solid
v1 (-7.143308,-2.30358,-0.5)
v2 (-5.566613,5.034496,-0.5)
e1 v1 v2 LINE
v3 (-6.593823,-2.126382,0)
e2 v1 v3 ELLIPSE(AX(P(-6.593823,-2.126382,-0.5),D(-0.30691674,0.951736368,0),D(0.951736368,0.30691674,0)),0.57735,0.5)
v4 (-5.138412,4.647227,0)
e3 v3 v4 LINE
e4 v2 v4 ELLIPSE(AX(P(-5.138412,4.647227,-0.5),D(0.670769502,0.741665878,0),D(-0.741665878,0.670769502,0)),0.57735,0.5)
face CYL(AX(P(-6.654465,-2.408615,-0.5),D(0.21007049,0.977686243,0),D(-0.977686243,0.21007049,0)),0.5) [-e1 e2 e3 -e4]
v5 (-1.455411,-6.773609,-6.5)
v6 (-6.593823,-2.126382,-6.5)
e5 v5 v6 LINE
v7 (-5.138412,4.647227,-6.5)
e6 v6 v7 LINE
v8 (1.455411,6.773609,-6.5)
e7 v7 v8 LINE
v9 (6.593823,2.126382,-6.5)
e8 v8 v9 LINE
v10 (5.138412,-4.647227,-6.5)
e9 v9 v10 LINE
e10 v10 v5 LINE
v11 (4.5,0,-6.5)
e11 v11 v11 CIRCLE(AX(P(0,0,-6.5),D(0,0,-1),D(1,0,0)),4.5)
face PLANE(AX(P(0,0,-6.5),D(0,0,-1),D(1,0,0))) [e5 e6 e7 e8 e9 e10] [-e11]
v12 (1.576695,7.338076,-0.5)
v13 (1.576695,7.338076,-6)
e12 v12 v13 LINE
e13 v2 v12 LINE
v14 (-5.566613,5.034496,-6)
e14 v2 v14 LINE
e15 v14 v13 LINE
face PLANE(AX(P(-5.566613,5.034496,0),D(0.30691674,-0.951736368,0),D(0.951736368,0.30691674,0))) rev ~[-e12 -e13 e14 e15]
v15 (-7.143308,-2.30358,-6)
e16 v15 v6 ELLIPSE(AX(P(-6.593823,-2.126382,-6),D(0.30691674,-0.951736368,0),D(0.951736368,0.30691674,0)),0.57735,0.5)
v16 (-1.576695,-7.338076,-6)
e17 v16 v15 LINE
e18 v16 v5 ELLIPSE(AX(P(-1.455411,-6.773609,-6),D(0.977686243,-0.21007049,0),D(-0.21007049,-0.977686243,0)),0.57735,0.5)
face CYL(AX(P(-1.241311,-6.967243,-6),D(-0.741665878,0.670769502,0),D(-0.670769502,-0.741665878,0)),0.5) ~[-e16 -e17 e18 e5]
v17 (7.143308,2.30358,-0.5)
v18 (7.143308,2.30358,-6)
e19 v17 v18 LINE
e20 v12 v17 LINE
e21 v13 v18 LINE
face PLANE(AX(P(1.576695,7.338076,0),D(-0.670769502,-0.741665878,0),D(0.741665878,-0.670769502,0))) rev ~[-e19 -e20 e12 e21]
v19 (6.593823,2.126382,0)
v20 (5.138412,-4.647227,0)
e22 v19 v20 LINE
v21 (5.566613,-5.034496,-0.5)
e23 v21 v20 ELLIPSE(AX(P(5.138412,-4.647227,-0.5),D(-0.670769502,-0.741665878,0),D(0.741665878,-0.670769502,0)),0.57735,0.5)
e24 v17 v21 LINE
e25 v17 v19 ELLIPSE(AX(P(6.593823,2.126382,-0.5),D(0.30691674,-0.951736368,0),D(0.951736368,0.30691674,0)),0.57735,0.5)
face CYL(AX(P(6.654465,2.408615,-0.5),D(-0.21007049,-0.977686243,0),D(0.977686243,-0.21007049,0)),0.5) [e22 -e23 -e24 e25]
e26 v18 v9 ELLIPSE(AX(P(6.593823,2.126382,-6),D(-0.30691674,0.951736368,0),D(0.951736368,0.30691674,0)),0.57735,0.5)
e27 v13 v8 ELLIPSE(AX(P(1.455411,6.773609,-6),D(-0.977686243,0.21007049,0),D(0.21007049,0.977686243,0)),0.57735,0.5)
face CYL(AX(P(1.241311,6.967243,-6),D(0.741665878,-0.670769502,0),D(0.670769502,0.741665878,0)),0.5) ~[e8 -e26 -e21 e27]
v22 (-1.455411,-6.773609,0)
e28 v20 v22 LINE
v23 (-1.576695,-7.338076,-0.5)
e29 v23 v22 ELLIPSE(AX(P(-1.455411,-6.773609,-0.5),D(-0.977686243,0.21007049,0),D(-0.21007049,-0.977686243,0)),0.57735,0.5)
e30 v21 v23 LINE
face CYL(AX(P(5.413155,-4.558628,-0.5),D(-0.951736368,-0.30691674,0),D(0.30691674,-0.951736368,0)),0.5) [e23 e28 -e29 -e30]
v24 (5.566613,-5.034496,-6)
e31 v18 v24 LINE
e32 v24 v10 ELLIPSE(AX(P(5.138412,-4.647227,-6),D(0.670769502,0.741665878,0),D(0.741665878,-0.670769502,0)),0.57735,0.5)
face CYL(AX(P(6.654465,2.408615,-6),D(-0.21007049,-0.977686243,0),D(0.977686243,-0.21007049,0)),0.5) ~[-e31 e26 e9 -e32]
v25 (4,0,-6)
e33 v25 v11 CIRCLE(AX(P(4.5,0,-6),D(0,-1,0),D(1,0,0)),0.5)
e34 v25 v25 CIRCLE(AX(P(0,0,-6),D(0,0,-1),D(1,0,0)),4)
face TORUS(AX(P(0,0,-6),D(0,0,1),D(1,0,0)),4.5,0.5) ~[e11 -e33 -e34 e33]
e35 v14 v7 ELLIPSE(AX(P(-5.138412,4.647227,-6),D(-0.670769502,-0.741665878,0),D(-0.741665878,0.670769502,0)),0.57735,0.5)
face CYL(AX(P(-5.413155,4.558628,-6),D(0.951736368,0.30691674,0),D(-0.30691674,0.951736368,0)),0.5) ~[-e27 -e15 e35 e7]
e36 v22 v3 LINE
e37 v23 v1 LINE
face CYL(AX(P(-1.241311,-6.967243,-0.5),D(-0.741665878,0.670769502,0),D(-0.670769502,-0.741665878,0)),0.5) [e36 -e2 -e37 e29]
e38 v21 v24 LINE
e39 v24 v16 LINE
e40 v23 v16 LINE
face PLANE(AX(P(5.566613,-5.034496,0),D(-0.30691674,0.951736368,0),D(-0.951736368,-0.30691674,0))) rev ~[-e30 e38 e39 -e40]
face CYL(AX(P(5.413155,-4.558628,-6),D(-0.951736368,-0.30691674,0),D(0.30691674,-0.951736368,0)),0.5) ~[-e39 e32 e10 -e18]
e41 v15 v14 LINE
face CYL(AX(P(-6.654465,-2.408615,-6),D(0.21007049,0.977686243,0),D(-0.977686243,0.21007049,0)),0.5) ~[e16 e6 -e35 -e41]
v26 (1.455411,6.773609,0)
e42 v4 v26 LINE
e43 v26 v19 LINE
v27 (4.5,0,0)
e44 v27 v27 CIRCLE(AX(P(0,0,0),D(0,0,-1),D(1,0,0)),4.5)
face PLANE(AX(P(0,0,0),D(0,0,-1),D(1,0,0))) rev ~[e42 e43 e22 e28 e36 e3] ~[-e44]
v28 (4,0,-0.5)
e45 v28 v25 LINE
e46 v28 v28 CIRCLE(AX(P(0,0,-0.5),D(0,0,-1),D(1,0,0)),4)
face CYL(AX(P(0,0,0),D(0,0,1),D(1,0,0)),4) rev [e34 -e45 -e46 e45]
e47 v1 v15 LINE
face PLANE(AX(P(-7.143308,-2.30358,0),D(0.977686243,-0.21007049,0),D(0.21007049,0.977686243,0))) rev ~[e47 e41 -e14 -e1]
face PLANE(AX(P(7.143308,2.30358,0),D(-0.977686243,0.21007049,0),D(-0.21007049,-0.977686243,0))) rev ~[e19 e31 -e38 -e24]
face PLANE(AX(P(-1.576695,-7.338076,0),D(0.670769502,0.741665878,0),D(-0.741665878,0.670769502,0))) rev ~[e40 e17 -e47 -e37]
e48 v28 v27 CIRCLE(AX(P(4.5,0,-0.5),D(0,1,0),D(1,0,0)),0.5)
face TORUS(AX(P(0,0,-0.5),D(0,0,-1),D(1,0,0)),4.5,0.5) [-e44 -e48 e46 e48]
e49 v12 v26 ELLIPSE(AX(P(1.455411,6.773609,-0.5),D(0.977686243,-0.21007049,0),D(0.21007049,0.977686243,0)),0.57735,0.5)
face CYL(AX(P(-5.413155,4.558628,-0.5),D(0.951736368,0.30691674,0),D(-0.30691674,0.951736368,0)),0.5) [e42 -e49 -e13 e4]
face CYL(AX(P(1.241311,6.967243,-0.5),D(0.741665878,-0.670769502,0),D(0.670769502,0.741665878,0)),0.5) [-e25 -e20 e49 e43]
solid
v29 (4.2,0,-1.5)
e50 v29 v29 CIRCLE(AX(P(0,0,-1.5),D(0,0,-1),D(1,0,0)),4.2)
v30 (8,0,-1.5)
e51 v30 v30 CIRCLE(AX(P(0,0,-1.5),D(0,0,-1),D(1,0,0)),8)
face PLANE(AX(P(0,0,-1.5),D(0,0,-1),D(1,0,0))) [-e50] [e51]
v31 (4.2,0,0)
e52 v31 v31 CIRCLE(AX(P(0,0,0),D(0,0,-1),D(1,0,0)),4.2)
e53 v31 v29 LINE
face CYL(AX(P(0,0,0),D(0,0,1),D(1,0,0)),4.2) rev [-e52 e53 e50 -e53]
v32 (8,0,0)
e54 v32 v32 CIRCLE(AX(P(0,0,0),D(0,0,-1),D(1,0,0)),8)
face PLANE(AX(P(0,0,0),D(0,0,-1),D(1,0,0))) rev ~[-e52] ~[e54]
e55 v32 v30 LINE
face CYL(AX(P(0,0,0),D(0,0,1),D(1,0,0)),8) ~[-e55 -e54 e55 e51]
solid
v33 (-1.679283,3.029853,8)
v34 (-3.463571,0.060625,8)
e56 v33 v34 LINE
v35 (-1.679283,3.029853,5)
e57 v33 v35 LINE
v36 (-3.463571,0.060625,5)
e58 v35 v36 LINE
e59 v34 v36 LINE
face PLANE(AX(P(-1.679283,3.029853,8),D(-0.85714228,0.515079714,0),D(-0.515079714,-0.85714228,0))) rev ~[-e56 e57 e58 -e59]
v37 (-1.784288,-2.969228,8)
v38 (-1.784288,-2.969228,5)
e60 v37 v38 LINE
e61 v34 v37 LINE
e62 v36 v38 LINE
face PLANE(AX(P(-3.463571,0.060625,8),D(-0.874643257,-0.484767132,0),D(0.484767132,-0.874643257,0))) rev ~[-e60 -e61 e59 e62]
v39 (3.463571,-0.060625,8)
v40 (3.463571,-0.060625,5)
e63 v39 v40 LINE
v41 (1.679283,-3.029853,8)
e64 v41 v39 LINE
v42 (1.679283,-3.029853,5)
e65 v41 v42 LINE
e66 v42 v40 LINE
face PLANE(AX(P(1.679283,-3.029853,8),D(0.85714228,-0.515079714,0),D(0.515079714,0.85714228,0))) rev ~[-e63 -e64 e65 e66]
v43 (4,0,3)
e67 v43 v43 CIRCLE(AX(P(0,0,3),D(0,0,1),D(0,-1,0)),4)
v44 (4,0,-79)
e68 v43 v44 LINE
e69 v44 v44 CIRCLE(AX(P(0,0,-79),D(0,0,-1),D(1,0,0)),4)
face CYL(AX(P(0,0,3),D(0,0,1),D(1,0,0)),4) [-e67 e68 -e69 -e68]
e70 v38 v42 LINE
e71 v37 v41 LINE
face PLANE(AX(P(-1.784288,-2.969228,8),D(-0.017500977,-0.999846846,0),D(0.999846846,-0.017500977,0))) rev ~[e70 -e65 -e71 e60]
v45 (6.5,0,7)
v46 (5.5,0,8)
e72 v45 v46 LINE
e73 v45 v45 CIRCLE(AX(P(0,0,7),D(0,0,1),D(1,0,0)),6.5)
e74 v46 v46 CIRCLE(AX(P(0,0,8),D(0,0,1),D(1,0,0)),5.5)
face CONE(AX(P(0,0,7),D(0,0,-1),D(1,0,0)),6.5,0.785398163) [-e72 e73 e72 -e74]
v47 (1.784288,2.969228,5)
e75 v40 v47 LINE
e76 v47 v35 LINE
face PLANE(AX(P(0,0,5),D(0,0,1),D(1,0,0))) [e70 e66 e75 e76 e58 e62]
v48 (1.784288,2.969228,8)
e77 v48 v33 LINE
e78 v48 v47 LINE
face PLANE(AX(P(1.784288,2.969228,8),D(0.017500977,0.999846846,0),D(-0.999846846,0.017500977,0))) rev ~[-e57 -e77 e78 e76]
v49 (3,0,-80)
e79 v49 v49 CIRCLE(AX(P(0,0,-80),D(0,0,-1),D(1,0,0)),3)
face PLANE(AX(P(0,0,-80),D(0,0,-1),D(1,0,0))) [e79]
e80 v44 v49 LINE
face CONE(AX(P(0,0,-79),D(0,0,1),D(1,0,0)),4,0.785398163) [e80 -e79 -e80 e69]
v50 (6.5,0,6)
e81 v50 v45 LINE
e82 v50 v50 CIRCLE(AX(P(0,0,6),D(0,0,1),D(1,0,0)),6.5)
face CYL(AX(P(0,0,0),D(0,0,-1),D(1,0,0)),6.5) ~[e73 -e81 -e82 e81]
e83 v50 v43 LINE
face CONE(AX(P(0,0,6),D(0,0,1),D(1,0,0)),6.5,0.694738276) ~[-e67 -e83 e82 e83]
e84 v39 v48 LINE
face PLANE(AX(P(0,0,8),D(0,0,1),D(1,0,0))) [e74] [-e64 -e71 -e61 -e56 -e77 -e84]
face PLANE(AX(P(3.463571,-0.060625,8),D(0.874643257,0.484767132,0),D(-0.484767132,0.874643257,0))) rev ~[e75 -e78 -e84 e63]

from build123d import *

# Parameters (mm, degrees)
F0_R         = 6.5
F1_DEPTH     = 8
F2_R         = 4
F3_DEPTH     = 80
F5_DEPTH     = 3
F6_SIZE      = 1
F7_R         = 4
F8_DEPTH     = 6.5
F9_R         = 0.5
F10_R        = 8
F10_R_2      = 4.2
F11_DEPTH    = 1.5
F12_S5_R     = 4
F12_T6_DEPTH = 11


# Not quite as in the source:
# - a fillet or chamfer that OpenCascade refuses, or shapes differently, is made with other operations: its cross-section is extruded or revolved along the edge and cut away or added


with BuildPart() as f1:
    # F0 (on Top) → F1 (new body)
    with BuildSketch(Plane.XY):
        Circle(F0_R)
    extrude(amount=F1_DEPTH)

    # F2 (on face) → F3 (join)
    with BuildSketch(Plane(origin=(0, 0, 0), x_dir=(1, 0, 0), z_dir=(0, 0, -1))):
        Circle(F2_R)
    extrude(amount=F3_DEPTH)

    # F4 (on face) → F5 (cut)
    with BuildSketch(Plane.XY.offset(8)):
        Polygon((-1.6792826051, 3.0298531206), (-3.4635710747, 0.0606251641), (-1.7842884696, -2.9692279564), (1.6792826051, -3.0298531206), (3.4635710747, -0.0606251641), (1.7842884696, 2.9692279564), align=None)
    extrude(amount=-F5_DEPTH, mode=Mode.SUBTRACT)

    # F6
    f6_edges = [f1.edges().sort_by_distance(p)[0] for p in [
        (-4, 0, -80),
        (-6.5, 0, 8),
    ]]
    chamfer(f6_edges, length=F6_SIZE)

    # F12: chamfer of 6 x 5 on 1 edges, made by hand


with BuildPart() as f8:
    # F7 (on face) → F8 (new body)
    with BuildSketch(Plane(origin=(0, 0, 0), x_dir=(1, 0, 0), z_dir=(0, 0, -1))):
        Polygon((1.5766953018, -7.3380764004), (7.1433082286, -2.3035800149), (5.5666129268, 5.0344963856), (-1.5766953018, 7.3380764004), (-7.1433082286, 2.3035800149), (-5.5666129268, -5.0344963856), align=None)
        Circle(F7_R, mode=Mode.SUBTRACT)
    extrude(amount=F8_DEPTH)

    # F9
    f9_edges = [f8.edges().sort_by_distance(p)[0] for p in [
        (-6.354961, 1.365458, -6.5),
        (-1.994959, 6.186286, -6.5),
        (4.360002, 4.820828, -6.5),
        (6.354961, -1.365458, -6.5),
        (1.994959, -6.186286, -6.5),
        (-4.360002, -4.820828, -6.5),
        (-4, 0, -6.5),
        (-6.354961, 1.365458, 0),
        (-1.994959, 6.186286, 0),
        (4.360002, 4.820828, 0),
        (6.354961, -1.365458, 0),
        (1.994959, -6.186286, 0),
        (-4.360002, -4.820828, 0),
        (-4, 0, 0),
    ]]
    fillet(f9_edges, radius=F9_R)


with BuildPart() as f11:
    # F10 (on face) → F11 (new body)
    with BuildSketch(Plane(origin=(0, 0, 0), x_dir=(1, 0, 0), z_dir=(0, 0, -1))):
        Circle(F10_R)
        Circle(F10_R_2, mode=Mode.SUBTRACT)
    extrude(amount=F11_DEPTH)


with BuildPart() as f12_tool2:
    # F12_s3 → F12_t4 (revolve)
    with BuildSketch(Plane.XZ):
        Polygon((6.5, 6), (1.5, 0), (6.5, 0), align=None)
    revolve(axis=Axis((0, 0, 0), (0, 0, 1)))

    # F12_s5 → F12_t6 (cut, symmetric)
    with BuildSketch(Plane.XY.offset(3)):
        Circle(F12_S5_R)
    extrude(amount=F12_T6_DEPTH, both=True, mode=Mode.SUBTRACT)


with BuildPart() as f1_1:
    add(f1.part)

    # F12_t1: cut F12_tool2
    add(f12_tool2.part, mode=Mode.SUBTRACT)


solid = Compound([f8.part, f11.part, f1_1.part])
